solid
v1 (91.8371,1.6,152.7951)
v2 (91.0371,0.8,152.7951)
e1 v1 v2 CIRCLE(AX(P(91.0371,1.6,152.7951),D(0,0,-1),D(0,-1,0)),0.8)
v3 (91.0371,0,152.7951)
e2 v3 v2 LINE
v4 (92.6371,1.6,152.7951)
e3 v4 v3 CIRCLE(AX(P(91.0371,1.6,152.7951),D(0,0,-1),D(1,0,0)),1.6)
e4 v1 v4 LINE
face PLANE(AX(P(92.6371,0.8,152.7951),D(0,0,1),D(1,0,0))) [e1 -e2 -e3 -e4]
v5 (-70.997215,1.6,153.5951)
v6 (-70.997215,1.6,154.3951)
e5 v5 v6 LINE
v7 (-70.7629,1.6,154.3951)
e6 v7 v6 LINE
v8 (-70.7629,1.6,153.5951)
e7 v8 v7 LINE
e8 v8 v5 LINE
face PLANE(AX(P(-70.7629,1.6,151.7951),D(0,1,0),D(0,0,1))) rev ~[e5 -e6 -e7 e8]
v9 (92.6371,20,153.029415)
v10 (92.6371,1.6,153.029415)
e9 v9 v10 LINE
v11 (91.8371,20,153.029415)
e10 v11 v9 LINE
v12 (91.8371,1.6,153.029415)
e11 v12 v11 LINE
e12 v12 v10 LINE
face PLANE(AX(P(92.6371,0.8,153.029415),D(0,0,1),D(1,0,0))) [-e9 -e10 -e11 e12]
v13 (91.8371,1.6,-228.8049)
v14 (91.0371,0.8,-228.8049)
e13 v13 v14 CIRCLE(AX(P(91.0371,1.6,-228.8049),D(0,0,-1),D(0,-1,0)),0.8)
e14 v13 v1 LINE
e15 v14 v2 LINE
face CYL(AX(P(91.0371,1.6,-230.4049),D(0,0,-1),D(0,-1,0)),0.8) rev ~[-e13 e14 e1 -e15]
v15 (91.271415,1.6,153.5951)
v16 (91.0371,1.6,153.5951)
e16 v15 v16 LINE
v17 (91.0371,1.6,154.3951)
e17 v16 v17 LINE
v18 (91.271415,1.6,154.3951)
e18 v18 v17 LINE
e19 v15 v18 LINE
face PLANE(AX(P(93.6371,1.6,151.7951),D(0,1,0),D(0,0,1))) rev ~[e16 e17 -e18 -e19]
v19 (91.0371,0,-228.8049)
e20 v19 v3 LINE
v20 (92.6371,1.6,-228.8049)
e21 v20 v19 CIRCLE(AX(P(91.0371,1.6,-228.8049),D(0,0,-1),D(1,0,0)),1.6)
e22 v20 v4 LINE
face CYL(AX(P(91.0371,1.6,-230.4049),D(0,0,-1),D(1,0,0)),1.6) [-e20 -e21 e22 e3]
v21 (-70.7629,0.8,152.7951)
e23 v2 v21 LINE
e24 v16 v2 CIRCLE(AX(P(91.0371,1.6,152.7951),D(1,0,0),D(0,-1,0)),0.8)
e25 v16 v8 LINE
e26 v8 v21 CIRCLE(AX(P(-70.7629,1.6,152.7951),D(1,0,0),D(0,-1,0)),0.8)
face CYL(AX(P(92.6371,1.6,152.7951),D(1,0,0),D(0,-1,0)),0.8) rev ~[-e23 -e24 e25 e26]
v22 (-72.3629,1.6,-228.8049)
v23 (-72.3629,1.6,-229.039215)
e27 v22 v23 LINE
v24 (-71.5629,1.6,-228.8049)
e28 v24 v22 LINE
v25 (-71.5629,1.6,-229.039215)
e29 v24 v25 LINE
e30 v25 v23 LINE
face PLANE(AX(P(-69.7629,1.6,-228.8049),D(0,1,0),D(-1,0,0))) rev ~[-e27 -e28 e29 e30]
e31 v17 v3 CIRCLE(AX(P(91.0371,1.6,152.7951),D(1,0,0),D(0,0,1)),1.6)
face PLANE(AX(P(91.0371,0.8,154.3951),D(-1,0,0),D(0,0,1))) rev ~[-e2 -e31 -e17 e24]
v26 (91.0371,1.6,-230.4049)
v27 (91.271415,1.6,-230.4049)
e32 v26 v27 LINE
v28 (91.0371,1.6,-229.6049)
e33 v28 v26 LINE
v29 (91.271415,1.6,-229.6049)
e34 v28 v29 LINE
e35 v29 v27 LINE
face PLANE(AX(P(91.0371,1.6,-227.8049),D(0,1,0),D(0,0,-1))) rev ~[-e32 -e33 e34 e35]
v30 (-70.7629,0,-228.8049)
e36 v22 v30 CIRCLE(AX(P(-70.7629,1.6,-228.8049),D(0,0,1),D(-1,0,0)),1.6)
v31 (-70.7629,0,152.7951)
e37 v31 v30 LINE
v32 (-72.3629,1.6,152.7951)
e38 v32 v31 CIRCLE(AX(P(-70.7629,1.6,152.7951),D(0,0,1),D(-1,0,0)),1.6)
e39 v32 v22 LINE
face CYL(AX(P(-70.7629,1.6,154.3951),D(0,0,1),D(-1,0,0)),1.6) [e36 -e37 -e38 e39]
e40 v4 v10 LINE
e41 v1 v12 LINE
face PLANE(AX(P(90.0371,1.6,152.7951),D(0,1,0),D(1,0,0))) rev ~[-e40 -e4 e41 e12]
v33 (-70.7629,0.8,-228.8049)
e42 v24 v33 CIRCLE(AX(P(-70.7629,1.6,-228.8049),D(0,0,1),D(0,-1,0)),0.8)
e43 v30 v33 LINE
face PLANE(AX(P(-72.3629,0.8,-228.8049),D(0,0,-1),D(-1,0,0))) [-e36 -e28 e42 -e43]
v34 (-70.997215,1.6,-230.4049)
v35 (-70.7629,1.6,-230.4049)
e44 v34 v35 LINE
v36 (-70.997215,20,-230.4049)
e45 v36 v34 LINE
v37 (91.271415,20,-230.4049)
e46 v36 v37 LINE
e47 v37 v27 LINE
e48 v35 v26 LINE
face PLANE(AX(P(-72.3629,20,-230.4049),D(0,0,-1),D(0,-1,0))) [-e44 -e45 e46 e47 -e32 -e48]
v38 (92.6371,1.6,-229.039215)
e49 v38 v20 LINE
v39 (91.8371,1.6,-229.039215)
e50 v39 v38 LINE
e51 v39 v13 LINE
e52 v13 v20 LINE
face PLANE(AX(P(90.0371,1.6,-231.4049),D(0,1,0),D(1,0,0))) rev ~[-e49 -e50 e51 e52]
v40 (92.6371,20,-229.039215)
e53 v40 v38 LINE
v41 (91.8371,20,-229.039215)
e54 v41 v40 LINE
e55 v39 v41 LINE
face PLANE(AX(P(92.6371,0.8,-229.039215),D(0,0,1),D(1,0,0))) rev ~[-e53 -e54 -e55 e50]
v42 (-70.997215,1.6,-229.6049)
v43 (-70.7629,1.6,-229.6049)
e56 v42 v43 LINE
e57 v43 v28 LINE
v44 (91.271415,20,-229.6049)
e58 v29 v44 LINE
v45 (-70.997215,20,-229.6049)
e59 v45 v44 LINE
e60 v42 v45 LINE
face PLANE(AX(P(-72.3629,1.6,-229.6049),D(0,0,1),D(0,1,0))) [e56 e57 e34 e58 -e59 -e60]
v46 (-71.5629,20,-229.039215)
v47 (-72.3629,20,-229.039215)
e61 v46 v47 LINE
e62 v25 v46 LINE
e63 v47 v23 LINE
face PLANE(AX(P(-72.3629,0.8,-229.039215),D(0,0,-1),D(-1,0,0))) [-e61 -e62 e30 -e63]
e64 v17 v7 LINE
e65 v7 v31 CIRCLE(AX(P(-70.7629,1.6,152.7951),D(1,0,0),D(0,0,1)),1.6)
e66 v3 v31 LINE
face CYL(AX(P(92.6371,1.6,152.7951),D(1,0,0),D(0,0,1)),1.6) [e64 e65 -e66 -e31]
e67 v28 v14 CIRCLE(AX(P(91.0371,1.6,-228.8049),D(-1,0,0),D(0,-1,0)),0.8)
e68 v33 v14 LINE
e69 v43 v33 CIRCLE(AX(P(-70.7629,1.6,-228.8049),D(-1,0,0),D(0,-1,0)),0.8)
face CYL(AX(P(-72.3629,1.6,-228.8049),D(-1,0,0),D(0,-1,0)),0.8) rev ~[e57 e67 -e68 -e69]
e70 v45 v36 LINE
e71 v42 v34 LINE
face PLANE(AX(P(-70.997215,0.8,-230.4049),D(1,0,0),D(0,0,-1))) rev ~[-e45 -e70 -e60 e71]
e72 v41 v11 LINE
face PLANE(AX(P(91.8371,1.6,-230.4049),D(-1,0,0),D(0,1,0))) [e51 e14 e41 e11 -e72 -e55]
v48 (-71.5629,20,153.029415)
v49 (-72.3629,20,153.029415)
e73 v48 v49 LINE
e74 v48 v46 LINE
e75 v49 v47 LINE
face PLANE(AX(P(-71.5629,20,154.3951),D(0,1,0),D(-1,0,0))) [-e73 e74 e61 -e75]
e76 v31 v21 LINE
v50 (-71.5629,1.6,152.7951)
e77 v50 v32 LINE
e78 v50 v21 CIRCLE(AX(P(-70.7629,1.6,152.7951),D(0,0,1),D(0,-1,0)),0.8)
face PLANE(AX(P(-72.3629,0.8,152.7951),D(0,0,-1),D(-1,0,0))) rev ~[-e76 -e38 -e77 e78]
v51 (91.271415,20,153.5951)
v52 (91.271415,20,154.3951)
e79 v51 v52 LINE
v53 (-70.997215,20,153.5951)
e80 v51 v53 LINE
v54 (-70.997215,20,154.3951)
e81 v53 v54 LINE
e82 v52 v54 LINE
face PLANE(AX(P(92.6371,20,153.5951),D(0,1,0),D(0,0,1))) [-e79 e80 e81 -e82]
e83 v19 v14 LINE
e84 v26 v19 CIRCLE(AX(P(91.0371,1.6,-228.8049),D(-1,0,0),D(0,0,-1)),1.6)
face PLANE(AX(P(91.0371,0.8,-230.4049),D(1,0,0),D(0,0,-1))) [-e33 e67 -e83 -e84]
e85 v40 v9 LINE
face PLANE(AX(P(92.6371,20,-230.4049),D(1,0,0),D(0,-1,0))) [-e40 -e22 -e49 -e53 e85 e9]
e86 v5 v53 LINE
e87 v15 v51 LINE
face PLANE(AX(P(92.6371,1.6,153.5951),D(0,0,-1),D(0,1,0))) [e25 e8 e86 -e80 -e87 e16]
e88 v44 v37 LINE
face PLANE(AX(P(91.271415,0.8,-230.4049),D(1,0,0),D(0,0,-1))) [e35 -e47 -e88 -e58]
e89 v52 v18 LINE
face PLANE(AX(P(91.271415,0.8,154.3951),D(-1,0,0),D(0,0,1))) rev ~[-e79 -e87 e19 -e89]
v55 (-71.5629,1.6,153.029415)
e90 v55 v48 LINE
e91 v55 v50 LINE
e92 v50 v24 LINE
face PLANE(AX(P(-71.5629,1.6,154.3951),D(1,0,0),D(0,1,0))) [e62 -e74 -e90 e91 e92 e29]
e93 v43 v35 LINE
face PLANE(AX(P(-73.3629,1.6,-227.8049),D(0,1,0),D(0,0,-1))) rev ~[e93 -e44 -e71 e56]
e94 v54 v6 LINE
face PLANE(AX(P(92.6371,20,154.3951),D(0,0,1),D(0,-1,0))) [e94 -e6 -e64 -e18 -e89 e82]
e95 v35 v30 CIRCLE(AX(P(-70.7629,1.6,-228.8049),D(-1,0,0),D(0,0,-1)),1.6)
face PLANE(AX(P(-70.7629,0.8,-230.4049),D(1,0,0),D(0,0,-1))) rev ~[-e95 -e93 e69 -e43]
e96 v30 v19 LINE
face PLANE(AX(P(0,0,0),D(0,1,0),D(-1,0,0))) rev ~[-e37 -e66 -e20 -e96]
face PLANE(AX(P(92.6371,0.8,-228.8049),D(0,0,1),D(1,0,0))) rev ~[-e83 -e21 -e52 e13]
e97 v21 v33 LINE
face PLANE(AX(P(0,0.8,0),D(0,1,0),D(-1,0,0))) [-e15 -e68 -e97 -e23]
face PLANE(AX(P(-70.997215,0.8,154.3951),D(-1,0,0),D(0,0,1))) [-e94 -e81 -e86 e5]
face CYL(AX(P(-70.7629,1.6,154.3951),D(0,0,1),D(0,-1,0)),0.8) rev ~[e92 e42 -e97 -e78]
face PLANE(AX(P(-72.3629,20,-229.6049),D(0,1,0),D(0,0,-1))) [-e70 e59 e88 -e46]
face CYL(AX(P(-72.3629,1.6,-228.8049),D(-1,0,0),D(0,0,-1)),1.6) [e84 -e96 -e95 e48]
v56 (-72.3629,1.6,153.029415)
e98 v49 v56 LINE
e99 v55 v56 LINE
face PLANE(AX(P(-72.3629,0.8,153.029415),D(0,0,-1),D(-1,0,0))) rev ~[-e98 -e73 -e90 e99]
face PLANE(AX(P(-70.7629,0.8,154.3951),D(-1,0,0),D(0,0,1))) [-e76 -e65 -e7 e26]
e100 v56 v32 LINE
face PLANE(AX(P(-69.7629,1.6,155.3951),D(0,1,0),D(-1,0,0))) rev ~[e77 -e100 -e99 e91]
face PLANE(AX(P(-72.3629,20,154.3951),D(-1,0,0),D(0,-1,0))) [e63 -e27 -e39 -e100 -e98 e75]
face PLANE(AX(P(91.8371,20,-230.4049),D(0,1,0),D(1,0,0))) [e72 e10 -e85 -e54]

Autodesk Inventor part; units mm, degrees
ref_plane "YZ Plane" through (0, 0, 0) normal (1, 0, 0) x (0, 1, 0)
ref_plane "XZ Plane" through (0, 0, 0) normal (0, 1, 0) x (-1, 0, 0)
ref_plane "XY Plane" through (0, 0, 0) normal (0, 0, 1) x (1, 0, 0)
sketch "Sketch1" plane through (0, 0, 0) normal (0, 1, 0) x (-1, 0, 0)
  line L0 (72.3629, 154.3951) -> (-92.6371, 154.3951)
  line L1 (-92.6371, 154.3951) -> (-92.6371, -230.4049)
  line L2 (-92.6371, -230.4049) -> (72.3629, -230.4049)
  line L3 (72.3629, -230.4049) -> (72.3629, 154.3951)
  point P0 (0, 0)
  dimension "d0" = 165
  dimension "d1" = 384.8
extrude "Plate1" add sketch "Sketch1" along normal blind 0.8
sketch "Sketch2" plane through (92.6371, 0, 153.5951) normal (0, 0, 1) x (1, 0, 0)
  line L0 (-165, 0) -> (0, 0)
  line L1 (0, 0) -> (0, 20)
  line L2 (0, 20) -> (-165, 20)
  line L3 (-165, 20) -> (-165, 0)
edge flange "Flange1" height 20 angle 90 thickness 0.8 bend radius 0.8 thickness toward (0, 0, 1) relief tear relief width 0.8 relief depth 0.4 corner gap 0.8 corner form 2 edges at (10.1371, 0.8, 154.3951) (-72.3629, 0.8, -38.0049) (92.6371, 0.8, -38.0049) (10.1371, 0.8, -230.4049) wall of the first edge with corners at (-72.3629, 0, 153.5951) (92.6371, 0, 153.5951) (92.6371, 20, 153.5951) (-72.3629, 20, 153.5951)
bend "Bend1"
corner "Corner1"
equation "\"d2\" = Thickness"
equation "\"d3\" = BendReliefWidth"
equation "\"d4\" = BendReliefDepth"
equation "\"d5\" = MinimumRemnant"
equation "\"d6\" = TransitionRadius"
equation "\"d9\" = BendRadius"
equation "\"d10\" = CornerReliefSize"
equation "\"d11\" = GapSize"
equation "\"d12\" = JacobiRadiusSize"
equation "\"BendRadius\" = Thickness"
equation "\"BendReliefWidth\" = Thickness"
equation "\"BendReliefDepth\" = 0.5 * Thickness"
equation "\"CornerReliefSize\" = 4 * Thickness"
equation "\"MinimumRemnant\" = 2 * Thickness"
equation "\"TransitionRadius\" = BendRadius"
equation "\"JacobiRadiusSize\" = BendRadius"
equation "\"GapSize\" = Thickness"
equation "\"Thickness\" = 0.8"
properties part number "Front_plate"
